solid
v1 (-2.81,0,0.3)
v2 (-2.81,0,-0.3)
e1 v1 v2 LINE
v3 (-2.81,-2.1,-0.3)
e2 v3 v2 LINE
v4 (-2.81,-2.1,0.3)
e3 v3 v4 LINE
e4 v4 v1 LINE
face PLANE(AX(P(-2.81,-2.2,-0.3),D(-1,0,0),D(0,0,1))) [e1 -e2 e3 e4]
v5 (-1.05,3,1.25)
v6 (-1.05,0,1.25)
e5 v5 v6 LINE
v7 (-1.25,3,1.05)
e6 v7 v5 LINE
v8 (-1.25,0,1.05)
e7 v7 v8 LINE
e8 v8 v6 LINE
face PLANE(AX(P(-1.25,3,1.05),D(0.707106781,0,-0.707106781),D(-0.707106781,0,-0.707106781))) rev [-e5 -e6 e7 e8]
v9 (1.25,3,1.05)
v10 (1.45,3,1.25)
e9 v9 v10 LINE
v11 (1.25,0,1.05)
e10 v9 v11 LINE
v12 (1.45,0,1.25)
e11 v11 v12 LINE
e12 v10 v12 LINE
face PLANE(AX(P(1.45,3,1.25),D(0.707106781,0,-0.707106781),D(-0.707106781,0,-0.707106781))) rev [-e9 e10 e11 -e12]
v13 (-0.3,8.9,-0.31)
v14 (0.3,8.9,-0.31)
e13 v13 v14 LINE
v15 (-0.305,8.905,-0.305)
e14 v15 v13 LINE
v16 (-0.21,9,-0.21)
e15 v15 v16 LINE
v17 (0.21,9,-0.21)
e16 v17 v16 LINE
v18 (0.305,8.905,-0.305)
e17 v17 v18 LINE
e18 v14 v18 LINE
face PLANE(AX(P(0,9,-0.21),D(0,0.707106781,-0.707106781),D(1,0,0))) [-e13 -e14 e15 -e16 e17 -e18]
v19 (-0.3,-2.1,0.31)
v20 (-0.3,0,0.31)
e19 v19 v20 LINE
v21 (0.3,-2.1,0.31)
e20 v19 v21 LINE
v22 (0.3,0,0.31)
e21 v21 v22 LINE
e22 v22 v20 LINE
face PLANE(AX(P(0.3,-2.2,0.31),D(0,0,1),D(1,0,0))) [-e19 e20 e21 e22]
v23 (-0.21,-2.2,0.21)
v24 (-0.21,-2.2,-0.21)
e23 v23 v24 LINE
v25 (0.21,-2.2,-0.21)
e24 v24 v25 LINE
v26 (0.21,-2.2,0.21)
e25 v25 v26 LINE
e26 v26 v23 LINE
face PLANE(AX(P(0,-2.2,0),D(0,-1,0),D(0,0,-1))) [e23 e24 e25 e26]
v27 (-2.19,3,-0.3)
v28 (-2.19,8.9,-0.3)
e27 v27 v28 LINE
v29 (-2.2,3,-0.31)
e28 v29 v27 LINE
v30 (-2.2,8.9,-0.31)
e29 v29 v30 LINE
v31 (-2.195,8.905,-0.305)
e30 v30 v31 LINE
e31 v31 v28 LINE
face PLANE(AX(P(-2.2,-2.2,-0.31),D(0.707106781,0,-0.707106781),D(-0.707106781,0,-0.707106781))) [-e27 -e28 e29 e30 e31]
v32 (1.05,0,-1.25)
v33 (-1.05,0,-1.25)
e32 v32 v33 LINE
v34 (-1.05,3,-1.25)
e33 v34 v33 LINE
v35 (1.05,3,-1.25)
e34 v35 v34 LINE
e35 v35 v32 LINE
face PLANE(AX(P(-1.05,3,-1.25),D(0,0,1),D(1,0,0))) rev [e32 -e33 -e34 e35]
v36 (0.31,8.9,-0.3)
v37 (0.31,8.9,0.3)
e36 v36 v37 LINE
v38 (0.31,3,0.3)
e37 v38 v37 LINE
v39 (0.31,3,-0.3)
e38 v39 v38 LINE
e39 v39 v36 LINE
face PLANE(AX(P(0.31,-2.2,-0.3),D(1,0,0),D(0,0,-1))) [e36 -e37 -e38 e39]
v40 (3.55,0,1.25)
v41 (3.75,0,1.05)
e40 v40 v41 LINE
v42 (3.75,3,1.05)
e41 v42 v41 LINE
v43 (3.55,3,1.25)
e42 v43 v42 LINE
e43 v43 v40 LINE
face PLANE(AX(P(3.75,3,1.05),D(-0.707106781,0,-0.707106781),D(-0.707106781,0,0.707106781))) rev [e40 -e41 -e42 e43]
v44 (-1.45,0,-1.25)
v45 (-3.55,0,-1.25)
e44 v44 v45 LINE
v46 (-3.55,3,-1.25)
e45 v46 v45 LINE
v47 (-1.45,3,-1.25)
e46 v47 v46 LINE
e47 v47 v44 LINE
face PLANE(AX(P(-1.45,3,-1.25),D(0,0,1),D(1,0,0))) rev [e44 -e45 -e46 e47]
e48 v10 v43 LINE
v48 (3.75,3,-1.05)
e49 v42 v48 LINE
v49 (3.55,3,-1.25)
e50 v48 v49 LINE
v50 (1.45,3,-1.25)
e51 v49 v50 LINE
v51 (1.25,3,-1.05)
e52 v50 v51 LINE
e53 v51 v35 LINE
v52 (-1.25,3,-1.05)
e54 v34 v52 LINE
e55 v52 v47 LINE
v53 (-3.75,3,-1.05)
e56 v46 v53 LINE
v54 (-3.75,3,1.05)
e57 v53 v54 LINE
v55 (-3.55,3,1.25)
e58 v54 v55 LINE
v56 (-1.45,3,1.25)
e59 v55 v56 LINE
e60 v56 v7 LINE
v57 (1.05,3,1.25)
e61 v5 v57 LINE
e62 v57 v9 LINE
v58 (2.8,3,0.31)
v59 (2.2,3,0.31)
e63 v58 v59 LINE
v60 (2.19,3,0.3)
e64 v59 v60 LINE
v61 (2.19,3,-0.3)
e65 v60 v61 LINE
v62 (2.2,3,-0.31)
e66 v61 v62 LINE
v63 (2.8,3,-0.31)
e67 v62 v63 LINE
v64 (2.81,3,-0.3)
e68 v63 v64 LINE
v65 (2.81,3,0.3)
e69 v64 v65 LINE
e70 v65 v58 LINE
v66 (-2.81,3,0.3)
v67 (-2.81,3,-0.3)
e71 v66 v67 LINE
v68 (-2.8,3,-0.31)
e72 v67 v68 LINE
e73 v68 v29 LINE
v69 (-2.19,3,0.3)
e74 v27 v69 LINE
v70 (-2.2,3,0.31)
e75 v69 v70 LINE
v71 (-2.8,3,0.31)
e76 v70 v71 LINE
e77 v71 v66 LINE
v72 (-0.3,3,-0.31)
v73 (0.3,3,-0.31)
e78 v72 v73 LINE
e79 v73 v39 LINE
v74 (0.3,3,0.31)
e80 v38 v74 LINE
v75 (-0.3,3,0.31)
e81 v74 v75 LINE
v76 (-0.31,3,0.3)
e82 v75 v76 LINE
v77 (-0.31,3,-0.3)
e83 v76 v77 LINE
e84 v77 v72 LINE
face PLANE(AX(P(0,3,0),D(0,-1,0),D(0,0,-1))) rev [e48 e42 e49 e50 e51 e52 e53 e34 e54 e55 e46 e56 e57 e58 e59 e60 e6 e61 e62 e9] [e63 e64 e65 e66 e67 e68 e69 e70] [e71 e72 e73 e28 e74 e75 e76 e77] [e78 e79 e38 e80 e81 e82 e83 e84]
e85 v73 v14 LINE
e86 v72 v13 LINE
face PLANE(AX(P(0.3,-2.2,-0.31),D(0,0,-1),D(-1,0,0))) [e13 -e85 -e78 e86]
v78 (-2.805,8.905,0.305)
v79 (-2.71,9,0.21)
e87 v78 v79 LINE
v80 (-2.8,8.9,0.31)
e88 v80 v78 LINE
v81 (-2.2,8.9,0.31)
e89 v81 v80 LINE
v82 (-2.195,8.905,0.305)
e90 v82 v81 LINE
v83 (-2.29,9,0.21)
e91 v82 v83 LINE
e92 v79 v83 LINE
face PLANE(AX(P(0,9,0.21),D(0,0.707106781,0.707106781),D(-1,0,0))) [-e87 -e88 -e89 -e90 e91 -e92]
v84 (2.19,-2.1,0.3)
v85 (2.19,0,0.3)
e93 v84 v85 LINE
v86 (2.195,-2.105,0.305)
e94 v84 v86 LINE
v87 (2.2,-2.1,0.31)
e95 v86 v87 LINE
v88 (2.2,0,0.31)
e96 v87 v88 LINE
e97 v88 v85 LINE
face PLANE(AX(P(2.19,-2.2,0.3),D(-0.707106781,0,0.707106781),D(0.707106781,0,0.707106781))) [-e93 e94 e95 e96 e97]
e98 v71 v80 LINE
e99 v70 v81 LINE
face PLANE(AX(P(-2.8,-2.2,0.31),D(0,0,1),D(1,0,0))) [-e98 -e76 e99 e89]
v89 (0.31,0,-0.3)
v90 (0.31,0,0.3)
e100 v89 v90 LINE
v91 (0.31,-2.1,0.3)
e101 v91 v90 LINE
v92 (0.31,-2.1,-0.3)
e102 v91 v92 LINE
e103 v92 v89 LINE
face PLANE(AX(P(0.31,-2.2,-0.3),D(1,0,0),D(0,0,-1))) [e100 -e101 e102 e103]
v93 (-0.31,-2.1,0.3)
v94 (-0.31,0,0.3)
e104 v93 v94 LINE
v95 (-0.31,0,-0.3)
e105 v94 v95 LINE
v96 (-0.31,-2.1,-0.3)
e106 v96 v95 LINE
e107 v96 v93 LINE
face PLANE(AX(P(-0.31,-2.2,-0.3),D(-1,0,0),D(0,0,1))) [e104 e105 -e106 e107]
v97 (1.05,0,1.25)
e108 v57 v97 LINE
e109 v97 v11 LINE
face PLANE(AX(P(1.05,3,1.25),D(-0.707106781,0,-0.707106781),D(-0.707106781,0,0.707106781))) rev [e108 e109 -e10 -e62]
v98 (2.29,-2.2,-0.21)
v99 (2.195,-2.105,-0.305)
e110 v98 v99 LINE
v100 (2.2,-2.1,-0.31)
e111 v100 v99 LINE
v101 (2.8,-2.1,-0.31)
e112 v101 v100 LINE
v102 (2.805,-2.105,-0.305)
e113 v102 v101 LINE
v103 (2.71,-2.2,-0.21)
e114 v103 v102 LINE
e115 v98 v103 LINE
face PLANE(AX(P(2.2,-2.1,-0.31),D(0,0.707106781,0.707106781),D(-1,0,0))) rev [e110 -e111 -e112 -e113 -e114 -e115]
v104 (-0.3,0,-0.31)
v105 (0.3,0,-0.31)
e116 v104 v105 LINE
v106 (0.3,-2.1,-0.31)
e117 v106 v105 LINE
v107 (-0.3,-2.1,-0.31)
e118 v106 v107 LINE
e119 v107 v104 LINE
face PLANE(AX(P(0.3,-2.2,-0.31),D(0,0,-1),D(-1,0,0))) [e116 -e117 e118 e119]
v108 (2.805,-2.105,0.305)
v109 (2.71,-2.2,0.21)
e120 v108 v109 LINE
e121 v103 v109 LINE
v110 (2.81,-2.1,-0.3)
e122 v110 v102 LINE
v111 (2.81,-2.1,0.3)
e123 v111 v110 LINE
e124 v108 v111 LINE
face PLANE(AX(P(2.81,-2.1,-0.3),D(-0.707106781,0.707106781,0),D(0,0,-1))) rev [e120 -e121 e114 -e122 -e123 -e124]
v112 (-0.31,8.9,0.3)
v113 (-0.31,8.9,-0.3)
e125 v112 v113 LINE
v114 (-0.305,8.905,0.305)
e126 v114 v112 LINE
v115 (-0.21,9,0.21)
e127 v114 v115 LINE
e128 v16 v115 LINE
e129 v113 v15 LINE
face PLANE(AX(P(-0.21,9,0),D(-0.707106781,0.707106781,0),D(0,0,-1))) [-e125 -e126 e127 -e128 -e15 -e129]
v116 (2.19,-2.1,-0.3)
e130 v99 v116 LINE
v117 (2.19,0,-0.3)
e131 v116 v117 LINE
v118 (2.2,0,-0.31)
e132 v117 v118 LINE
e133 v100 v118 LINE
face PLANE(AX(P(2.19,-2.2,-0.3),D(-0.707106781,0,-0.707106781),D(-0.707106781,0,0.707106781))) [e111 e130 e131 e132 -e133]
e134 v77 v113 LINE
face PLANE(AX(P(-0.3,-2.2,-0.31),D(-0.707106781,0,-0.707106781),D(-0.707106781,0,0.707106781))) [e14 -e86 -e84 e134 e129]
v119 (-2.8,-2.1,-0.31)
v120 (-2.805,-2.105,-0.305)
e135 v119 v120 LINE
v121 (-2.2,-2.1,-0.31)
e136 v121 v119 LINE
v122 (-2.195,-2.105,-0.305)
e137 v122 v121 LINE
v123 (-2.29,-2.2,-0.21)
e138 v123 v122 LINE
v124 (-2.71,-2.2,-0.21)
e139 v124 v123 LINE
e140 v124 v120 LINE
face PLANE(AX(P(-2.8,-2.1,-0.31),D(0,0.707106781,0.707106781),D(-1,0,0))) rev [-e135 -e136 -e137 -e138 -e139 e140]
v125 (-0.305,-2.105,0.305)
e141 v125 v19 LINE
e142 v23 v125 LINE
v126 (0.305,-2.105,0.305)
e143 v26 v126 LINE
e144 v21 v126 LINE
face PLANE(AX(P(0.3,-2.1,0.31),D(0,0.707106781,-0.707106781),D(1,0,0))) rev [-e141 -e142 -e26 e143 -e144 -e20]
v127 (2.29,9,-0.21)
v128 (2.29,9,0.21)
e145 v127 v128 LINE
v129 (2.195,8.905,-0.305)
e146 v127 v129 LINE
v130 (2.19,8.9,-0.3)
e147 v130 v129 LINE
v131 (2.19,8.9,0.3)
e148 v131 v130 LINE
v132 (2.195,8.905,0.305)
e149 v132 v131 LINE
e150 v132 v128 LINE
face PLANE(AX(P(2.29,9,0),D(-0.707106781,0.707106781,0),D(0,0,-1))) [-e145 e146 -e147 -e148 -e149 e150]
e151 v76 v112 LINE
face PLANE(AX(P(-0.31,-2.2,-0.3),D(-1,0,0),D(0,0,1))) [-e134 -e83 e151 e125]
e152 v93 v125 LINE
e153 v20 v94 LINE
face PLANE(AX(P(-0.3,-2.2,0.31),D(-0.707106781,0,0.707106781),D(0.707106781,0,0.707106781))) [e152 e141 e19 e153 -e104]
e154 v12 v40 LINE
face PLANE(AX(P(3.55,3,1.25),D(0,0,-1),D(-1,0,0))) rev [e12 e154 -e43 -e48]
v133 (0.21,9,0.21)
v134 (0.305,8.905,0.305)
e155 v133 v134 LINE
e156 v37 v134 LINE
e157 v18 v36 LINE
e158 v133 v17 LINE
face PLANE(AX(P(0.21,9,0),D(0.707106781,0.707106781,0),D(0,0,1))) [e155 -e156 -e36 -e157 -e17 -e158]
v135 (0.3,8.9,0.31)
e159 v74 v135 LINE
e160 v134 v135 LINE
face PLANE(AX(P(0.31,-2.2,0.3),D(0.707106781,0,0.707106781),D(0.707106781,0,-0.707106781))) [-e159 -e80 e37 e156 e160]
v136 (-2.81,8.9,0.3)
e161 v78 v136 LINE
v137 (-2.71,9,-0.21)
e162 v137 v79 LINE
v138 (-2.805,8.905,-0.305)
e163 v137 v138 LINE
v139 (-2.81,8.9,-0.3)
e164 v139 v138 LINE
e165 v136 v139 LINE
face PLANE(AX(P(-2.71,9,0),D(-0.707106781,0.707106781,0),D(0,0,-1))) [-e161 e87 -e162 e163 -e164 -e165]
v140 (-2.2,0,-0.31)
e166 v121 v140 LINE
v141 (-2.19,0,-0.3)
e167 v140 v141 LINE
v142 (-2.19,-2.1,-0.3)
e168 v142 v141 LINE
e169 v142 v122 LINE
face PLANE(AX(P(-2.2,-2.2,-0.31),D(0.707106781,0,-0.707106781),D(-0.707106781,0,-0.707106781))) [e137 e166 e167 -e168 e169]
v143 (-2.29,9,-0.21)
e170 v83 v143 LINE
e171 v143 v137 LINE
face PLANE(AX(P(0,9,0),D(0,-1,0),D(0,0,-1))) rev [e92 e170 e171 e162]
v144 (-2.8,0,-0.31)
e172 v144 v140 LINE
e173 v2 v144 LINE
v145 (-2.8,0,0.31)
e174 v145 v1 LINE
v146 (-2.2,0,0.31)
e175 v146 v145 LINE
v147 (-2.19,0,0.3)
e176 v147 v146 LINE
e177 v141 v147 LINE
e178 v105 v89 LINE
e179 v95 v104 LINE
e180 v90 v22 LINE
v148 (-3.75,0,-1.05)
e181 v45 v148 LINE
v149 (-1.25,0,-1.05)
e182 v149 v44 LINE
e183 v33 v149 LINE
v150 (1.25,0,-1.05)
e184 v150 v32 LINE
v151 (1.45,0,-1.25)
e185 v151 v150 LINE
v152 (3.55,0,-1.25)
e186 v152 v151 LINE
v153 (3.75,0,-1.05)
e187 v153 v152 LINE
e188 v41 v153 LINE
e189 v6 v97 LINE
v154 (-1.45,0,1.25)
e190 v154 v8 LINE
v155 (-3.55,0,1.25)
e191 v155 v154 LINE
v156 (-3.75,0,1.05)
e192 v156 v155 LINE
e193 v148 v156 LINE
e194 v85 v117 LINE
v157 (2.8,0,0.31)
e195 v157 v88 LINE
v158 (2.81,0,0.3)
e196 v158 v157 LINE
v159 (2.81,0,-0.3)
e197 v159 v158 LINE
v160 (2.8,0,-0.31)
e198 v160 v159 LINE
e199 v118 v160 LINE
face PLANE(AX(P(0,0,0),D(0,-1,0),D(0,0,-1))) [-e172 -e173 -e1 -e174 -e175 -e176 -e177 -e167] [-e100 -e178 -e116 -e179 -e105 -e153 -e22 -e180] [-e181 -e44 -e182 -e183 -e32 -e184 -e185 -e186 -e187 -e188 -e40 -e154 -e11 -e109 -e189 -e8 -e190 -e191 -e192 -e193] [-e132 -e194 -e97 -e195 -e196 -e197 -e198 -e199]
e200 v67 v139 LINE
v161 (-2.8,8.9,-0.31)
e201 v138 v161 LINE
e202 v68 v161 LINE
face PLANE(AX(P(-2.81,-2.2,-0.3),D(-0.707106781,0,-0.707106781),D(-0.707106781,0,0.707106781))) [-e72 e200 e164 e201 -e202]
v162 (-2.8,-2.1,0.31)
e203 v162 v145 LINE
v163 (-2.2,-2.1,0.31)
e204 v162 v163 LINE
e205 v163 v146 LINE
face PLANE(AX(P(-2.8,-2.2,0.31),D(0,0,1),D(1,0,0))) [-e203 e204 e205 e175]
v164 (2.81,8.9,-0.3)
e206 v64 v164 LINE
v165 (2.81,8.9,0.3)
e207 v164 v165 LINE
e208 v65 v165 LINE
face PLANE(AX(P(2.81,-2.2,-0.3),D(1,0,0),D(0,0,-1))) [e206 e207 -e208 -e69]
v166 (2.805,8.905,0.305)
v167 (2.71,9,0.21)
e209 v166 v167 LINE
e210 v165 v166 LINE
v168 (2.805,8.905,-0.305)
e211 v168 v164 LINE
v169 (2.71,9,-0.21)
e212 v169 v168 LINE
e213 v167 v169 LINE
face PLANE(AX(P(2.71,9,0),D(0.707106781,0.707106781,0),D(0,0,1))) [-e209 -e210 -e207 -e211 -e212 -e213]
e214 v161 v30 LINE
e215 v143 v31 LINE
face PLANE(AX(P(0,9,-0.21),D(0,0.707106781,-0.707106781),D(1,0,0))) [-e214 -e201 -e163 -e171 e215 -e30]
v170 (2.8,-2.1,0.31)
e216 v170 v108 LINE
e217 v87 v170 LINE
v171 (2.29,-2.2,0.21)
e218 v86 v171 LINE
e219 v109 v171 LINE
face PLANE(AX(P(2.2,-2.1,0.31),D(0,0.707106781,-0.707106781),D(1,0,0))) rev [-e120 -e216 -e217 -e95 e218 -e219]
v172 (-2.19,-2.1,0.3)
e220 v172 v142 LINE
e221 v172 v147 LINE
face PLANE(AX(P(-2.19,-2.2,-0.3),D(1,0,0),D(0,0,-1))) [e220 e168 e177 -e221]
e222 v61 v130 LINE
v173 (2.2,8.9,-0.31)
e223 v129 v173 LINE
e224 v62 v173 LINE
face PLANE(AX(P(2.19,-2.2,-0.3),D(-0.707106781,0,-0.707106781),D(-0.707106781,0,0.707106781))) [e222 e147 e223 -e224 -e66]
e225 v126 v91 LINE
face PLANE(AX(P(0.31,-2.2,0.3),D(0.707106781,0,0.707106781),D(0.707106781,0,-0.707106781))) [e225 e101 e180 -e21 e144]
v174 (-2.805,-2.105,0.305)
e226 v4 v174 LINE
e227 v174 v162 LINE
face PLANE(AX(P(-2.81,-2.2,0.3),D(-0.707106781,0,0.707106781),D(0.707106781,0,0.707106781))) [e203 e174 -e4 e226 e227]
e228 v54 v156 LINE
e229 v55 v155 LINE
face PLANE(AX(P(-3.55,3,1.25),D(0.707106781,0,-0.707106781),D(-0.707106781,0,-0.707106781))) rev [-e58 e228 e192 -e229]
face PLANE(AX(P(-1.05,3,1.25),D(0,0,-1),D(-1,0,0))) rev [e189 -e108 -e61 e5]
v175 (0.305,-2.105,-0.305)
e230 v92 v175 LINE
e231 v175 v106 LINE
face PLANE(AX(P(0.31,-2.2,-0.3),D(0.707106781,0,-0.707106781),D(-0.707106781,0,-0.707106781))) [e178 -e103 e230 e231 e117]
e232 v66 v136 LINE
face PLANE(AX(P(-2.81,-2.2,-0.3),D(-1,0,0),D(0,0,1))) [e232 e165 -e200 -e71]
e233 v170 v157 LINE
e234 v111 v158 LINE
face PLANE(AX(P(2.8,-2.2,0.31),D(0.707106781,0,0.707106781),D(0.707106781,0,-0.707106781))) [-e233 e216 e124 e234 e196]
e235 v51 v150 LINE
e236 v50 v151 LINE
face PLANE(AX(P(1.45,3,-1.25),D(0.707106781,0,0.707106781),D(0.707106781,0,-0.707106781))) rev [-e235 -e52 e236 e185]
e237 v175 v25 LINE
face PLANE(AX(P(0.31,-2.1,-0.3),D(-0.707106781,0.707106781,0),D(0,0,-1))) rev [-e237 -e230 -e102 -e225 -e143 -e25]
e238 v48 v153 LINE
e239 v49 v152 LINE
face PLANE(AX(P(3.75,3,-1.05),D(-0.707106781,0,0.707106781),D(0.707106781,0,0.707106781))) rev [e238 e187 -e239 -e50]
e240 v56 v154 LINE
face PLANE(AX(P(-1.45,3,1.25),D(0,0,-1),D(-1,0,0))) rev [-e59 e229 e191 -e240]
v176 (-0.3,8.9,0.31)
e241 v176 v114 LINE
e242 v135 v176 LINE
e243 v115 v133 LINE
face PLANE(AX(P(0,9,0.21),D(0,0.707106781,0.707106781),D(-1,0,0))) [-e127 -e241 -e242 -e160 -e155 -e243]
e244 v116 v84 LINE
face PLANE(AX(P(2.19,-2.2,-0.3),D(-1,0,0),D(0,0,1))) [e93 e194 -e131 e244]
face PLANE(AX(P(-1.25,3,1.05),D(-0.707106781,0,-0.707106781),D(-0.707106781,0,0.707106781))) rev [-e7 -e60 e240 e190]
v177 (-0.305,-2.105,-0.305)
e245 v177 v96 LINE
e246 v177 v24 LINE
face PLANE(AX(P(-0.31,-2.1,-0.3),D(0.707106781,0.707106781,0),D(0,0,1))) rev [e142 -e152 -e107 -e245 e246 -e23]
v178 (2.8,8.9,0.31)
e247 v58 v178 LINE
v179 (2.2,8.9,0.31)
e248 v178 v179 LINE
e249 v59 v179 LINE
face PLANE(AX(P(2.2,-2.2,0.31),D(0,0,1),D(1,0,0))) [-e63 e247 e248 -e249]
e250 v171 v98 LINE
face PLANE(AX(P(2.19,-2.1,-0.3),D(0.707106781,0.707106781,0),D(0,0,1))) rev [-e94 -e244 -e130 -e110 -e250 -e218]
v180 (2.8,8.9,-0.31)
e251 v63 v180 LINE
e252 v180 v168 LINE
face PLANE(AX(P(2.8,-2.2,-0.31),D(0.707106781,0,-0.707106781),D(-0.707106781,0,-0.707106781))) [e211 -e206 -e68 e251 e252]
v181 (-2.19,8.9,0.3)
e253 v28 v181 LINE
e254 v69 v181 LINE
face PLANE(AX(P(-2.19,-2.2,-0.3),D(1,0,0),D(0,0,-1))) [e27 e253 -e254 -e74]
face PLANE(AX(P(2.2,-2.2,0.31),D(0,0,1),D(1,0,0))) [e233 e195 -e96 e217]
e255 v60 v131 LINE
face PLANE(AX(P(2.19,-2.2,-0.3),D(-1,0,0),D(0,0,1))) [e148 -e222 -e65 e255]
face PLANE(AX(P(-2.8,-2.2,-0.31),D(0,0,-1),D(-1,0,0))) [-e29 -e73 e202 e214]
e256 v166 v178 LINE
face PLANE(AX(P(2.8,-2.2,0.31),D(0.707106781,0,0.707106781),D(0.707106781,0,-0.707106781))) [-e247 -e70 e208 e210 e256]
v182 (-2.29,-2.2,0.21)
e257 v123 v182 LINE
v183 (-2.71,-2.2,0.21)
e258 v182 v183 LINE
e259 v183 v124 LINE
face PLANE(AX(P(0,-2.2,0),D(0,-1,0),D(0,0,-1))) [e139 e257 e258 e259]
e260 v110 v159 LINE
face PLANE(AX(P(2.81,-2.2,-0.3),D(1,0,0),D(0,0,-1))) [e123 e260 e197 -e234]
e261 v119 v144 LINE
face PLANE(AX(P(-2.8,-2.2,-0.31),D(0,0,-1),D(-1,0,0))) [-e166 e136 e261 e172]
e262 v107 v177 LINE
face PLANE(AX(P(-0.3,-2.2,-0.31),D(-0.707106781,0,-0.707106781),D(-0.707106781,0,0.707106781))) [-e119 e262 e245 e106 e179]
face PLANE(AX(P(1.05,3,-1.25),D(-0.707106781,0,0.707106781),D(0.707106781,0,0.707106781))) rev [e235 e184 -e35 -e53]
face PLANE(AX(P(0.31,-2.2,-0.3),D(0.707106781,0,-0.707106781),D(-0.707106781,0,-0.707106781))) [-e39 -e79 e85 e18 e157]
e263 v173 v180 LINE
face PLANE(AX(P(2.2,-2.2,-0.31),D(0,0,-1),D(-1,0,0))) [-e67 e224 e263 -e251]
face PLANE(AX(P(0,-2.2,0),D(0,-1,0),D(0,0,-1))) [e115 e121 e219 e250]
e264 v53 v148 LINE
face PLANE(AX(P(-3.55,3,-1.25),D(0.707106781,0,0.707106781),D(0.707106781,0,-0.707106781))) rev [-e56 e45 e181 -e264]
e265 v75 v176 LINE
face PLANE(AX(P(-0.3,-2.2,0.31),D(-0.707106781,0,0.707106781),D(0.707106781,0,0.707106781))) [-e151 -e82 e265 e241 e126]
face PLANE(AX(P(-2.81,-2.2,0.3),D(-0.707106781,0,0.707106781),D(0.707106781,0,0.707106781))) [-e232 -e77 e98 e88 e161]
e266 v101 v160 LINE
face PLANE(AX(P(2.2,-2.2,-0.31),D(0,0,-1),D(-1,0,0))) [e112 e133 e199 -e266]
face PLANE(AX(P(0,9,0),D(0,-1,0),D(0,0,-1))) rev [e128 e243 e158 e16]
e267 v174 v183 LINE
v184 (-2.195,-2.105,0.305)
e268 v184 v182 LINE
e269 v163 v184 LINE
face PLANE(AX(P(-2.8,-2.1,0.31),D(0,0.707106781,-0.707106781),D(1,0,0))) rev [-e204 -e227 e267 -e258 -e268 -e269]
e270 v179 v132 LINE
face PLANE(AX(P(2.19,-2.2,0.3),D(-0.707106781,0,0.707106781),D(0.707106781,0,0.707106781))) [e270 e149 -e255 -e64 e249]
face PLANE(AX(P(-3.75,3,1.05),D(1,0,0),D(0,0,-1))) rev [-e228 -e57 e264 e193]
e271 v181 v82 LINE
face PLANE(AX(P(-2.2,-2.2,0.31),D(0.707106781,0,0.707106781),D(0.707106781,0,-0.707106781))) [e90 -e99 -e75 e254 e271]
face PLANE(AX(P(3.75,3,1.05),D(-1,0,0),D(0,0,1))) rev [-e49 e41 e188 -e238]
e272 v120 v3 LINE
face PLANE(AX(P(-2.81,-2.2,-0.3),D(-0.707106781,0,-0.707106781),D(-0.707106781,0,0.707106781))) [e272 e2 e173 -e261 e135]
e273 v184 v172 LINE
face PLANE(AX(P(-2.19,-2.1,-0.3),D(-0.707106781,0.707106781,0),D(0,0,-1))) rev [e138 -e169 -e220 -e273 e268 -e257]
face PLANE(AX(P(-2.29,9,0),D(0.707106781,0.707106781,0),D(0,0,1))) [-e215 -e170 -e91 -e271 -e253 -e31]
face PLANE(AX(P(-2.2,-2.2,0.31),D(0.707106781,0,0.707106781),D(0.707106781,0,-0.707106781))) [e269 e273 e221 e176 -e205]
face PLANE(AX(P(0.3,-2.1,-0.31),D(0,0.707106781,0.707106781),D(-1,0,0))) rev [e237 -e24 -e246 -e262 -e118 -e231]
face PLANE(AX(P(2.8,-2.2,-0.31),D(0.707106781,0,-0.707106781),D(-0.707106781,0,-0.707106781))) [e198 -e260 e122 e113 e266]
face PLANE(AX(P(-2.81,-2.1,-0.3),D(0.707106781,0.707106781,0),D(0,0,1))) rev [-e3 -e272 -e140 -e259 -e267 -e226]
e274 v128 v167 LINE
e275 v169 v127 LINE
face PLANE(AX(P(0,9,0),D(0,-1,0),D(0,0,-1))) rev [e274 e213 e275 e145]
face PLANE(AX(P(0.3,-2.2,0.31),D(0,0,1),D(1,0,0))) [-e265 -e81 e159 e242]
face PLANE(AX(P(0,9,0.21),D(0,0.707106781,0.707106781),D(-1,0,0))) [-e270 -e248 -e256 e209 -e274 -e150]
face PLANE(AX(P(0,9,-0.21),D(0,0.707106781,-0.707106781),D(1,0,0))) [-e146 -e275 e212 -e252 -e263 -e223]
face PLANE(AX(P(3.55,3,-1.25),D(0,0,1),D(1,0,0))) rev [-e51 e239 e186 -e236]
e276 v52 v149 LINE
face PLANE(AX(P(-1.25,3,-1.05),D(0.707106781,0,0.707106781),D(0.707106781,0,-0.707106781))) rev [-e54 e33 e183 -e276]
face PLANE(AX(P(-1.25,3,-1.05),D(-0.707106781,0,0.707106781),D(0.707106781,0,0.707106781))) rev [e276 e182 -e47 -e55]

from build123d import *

# Parameters (mm, degrees)
BOSS_EXTRUDE1_DEPTH      = 3
BOSS_EXTRUDE2_DEPTH      = 6
BOSS_EXTRUDE2_DEPTH_BACK = 5.2
CHAMFER1_SIZE            = 0.1


with BuildPart() as part:
    # Sketch2 → Boss-Extrude1 (new body)
    with BuildSketch(Plane(origin=(0, 0, 0), x_dir=(1, 0, 0), z_dir=(0, 1, 0))):
        Polygon((-1.25, -1.05), (-1.05, -1.25), (1.05, -1.25), (1.25, -1.05), (1.45, -1.25), (3.55, -1.25), (3.75, -1.05), (3.75, 1.05), (3.55, 1.25), (1.45, 1.25), (1.25, 1.05), (1.05, 1.25), (-1.05, 1.25), (-1.25, 1.05), (-1.45, 1.25), (-3.55, 1.25), (-3.75, 1.05), (-3.75, -1.05), (-3.55, -1.25), (-1.45, -1.25), align=None)
    extrude(amount=BOSS_EXTRUDE1_DEPTH)

    # Sketch3 → Boss-Extrude2 (add, two sides: drawn at the far end of the back side and taken through both)
    with BuildSketch(Plane(origin=(0, 3, 0), x_dir=(1, 0, 0), z_dir=(0, 1, 0)).offset(-BOSS_EXTRUDE2_DEPTH_BACK)):
        Polygon((0.3, 0.31), (-0.3, 0.31), (-0.31, 0.3), (-0.31, -0.3), (-0.3, -0.31), (0.3, -0.31), (0.31, -0.3), (0.31, 0.3), align=None)
        Polygon((-2.2, -0.31), (-2.19, -0.3), (-2.19, 0.3), (-2.2, 0.31), (-2.8, 0.31), (-2.81, 0.3), (-2.81, -0.3), (-2.8, -0.31), align=None)
        Polygon((2.8, -0.31), (2.81, -0.3), (2.81, 0.3), (2.8, 0.31), (2.2, 0.31), (2.19, 0.3), (2.19, -0.3), (2.2, -0.31), align=None)
    extrude(amount=BOSS_EXTRUDE2_DEPTH + BOSS_EXTRUDE2_DEPTH_BACK)

    # Chamfer1
    # the kernel refuses this chamfer: 0.1 mm, written as the material it takes off along each edge
    with BuildSketch(Plane(origin=(-2.81, 9, -0.557168299), x_dir=(-0.027495876610587656, -0.9996219169112966, 0), z_dir=(0, 0, 1)), Plane(origin=(-1.942831701, 9, -0.31), x_dir=(0, -0.9996219169112968, -0.02749587661058658), z_dir=(-1, 0, 0)), Plane(origin=(-2.19, 9, 0.557168299), x_dir=(0.027495876610587656, -0.9996219169112966, 0), z_dir=(0, 0, -1)), Plane(origin=(-3.057168299, 9, 0.31), x_dir=(0, -0.9996219169112968, 0.02749587661058658), z_dir=(1, 0, 0)), Plane(origin=(2.19, 9, -0.557168299), x_dir=(-0.027495876610587656, -0.9996219169112966, 0), z_dir=(0, 0, 1)), Plane(origin=(3.057168299, 9, -0.31), x_dir=(0, -0.9996219169112968, -0.02749587661058658), z_dir=(-1, 0, 0)), Plane(origin=(2.81, 9, 0.557168299), x_dir=(0.027495876610587656, -0.9996219169112966, 0), z_dir=(0, 0, -1)), Plane(origin=(1.942831701, 9, 0.31), x_dir=(0, -0.9996219169112968, 0.02749587661058658), z_dir=(1, 0, 0)), Plane(origin=(0.557168299, 9, -0.31), x_dir=(0, -0.9996219169112968, -0.02749587661058658), z_dir=(-1, 0, 0)), Plane(origin=(0.31, 9, 0.557168299), x_dir=(0.027495876610586577, -0.9996219169112966, 0), z_dir=(0, 0, -1)), Plane(origin=(-0.557168299, 9, 0.31), x_dir=(0, -0.9996219169112968, 0.02749587661058658), z_dir=(1, 0, 0)), Plane(origin=(-0.31, 9, -0.557168299), x_dir=(-0.027495876610586577, -0.9996219169112966, 0), z_dir=(0, 0, 1))) as chamfer1_piece_1:
        Polygon((CHAMFER1_SIZE * 0.999621916911, CHAMFER1_SIZE * 0.0274958766106), (-CHAMFER1_SIZE * 0.0274958766106, CHAMFER1_SIZE * 0.999621916911), (0, 0), align=None)
    extrude(amount=1.114336598, mode=Mode.SUBTRACT)
    with BuildSketch(Plane(origin=(2.81, -2.2, 0.557168299), x_dir=(0.02749587661058718, 0.9996219169112966, 0), z_dir=(0, 0, -1)), Plane(origin=(3.057168299, -2.2, -0.31), x_dir=(0, 0.9996219169112968, -0.027495876610586105), z_dir=(-1, 0, 0)), Plane(origin=(2.19, -2.2, -0.557168299), x_dir=(-0.02749587661058718, 0.9996219169112966, 0), z_dir=(0, 0, 1)), Plane(origin=(1.942831701, -2.2, 0.31), x_dir=(0, 0.9996219169112968, 0.027495876610586105), z_dir=(1, 0, 0)), Plane(origin=(-0.31, -2.2, -0.557168299), x_dir=(-0.027495876610586105, 0.9996219169112968, 0), z_dir=(0, 0, 1)), Plane(origin=(-0.557168299, -2.2, 0.31), x_dir=(0, 0.9996219169112968, 0.027495876610586105), z_dir=(1, 0, 0)), Plane(origin=(0.31, -2.2, 0.557168299), x_dir=(0.027495876610586105, 0.9996219169112968, 0), z_dir=(0, 0, -1)), Plane(origin=(0.557168299, -2.2, -0.31), x_dir=(0, 0.9996219169112968, -0.027495876610586105), z_dir=(-1, 0, 0)), Plane(origin=(-2.19, -2.2, 0.557168299), x_dir=(0.02749587661058718, 0.9996219169112966, 0), z_dir=(0, 0, -1)), Plane(origin=(-1.942831701, -2.2, -0.31), x_dir=(0, 0.9996219169112968, -0.027495876610586105), z_dir=(-1, 0, 0)), Plane(origin=(-2.81, -2.2, -0.557168299), x_dir=(-0.02749587661058718, 0.9996219169112966, 0), z_dir=(0, 0, 1)), Plane(origin=(-3.057168299, -2.2, 0.31), x_dir=(0, 0.9996219169112968, 0.027495876610586105), z_dir=(1, 0, 0))) as chamfer1_piece_2:
        Polygon((CHAMFER1_SIZE * 0.999621916911, -CHAMFER1_SIZE * 0.0274958766106), (-CHAMFER1_SIZE * 0.0274958766106, -CHAMFER1_SIZE * 0.999621916911), (0, 0), align=None)
    extrude(amount=1.114336598, mode=Mode.SUBTRACT)


solid = part.part
